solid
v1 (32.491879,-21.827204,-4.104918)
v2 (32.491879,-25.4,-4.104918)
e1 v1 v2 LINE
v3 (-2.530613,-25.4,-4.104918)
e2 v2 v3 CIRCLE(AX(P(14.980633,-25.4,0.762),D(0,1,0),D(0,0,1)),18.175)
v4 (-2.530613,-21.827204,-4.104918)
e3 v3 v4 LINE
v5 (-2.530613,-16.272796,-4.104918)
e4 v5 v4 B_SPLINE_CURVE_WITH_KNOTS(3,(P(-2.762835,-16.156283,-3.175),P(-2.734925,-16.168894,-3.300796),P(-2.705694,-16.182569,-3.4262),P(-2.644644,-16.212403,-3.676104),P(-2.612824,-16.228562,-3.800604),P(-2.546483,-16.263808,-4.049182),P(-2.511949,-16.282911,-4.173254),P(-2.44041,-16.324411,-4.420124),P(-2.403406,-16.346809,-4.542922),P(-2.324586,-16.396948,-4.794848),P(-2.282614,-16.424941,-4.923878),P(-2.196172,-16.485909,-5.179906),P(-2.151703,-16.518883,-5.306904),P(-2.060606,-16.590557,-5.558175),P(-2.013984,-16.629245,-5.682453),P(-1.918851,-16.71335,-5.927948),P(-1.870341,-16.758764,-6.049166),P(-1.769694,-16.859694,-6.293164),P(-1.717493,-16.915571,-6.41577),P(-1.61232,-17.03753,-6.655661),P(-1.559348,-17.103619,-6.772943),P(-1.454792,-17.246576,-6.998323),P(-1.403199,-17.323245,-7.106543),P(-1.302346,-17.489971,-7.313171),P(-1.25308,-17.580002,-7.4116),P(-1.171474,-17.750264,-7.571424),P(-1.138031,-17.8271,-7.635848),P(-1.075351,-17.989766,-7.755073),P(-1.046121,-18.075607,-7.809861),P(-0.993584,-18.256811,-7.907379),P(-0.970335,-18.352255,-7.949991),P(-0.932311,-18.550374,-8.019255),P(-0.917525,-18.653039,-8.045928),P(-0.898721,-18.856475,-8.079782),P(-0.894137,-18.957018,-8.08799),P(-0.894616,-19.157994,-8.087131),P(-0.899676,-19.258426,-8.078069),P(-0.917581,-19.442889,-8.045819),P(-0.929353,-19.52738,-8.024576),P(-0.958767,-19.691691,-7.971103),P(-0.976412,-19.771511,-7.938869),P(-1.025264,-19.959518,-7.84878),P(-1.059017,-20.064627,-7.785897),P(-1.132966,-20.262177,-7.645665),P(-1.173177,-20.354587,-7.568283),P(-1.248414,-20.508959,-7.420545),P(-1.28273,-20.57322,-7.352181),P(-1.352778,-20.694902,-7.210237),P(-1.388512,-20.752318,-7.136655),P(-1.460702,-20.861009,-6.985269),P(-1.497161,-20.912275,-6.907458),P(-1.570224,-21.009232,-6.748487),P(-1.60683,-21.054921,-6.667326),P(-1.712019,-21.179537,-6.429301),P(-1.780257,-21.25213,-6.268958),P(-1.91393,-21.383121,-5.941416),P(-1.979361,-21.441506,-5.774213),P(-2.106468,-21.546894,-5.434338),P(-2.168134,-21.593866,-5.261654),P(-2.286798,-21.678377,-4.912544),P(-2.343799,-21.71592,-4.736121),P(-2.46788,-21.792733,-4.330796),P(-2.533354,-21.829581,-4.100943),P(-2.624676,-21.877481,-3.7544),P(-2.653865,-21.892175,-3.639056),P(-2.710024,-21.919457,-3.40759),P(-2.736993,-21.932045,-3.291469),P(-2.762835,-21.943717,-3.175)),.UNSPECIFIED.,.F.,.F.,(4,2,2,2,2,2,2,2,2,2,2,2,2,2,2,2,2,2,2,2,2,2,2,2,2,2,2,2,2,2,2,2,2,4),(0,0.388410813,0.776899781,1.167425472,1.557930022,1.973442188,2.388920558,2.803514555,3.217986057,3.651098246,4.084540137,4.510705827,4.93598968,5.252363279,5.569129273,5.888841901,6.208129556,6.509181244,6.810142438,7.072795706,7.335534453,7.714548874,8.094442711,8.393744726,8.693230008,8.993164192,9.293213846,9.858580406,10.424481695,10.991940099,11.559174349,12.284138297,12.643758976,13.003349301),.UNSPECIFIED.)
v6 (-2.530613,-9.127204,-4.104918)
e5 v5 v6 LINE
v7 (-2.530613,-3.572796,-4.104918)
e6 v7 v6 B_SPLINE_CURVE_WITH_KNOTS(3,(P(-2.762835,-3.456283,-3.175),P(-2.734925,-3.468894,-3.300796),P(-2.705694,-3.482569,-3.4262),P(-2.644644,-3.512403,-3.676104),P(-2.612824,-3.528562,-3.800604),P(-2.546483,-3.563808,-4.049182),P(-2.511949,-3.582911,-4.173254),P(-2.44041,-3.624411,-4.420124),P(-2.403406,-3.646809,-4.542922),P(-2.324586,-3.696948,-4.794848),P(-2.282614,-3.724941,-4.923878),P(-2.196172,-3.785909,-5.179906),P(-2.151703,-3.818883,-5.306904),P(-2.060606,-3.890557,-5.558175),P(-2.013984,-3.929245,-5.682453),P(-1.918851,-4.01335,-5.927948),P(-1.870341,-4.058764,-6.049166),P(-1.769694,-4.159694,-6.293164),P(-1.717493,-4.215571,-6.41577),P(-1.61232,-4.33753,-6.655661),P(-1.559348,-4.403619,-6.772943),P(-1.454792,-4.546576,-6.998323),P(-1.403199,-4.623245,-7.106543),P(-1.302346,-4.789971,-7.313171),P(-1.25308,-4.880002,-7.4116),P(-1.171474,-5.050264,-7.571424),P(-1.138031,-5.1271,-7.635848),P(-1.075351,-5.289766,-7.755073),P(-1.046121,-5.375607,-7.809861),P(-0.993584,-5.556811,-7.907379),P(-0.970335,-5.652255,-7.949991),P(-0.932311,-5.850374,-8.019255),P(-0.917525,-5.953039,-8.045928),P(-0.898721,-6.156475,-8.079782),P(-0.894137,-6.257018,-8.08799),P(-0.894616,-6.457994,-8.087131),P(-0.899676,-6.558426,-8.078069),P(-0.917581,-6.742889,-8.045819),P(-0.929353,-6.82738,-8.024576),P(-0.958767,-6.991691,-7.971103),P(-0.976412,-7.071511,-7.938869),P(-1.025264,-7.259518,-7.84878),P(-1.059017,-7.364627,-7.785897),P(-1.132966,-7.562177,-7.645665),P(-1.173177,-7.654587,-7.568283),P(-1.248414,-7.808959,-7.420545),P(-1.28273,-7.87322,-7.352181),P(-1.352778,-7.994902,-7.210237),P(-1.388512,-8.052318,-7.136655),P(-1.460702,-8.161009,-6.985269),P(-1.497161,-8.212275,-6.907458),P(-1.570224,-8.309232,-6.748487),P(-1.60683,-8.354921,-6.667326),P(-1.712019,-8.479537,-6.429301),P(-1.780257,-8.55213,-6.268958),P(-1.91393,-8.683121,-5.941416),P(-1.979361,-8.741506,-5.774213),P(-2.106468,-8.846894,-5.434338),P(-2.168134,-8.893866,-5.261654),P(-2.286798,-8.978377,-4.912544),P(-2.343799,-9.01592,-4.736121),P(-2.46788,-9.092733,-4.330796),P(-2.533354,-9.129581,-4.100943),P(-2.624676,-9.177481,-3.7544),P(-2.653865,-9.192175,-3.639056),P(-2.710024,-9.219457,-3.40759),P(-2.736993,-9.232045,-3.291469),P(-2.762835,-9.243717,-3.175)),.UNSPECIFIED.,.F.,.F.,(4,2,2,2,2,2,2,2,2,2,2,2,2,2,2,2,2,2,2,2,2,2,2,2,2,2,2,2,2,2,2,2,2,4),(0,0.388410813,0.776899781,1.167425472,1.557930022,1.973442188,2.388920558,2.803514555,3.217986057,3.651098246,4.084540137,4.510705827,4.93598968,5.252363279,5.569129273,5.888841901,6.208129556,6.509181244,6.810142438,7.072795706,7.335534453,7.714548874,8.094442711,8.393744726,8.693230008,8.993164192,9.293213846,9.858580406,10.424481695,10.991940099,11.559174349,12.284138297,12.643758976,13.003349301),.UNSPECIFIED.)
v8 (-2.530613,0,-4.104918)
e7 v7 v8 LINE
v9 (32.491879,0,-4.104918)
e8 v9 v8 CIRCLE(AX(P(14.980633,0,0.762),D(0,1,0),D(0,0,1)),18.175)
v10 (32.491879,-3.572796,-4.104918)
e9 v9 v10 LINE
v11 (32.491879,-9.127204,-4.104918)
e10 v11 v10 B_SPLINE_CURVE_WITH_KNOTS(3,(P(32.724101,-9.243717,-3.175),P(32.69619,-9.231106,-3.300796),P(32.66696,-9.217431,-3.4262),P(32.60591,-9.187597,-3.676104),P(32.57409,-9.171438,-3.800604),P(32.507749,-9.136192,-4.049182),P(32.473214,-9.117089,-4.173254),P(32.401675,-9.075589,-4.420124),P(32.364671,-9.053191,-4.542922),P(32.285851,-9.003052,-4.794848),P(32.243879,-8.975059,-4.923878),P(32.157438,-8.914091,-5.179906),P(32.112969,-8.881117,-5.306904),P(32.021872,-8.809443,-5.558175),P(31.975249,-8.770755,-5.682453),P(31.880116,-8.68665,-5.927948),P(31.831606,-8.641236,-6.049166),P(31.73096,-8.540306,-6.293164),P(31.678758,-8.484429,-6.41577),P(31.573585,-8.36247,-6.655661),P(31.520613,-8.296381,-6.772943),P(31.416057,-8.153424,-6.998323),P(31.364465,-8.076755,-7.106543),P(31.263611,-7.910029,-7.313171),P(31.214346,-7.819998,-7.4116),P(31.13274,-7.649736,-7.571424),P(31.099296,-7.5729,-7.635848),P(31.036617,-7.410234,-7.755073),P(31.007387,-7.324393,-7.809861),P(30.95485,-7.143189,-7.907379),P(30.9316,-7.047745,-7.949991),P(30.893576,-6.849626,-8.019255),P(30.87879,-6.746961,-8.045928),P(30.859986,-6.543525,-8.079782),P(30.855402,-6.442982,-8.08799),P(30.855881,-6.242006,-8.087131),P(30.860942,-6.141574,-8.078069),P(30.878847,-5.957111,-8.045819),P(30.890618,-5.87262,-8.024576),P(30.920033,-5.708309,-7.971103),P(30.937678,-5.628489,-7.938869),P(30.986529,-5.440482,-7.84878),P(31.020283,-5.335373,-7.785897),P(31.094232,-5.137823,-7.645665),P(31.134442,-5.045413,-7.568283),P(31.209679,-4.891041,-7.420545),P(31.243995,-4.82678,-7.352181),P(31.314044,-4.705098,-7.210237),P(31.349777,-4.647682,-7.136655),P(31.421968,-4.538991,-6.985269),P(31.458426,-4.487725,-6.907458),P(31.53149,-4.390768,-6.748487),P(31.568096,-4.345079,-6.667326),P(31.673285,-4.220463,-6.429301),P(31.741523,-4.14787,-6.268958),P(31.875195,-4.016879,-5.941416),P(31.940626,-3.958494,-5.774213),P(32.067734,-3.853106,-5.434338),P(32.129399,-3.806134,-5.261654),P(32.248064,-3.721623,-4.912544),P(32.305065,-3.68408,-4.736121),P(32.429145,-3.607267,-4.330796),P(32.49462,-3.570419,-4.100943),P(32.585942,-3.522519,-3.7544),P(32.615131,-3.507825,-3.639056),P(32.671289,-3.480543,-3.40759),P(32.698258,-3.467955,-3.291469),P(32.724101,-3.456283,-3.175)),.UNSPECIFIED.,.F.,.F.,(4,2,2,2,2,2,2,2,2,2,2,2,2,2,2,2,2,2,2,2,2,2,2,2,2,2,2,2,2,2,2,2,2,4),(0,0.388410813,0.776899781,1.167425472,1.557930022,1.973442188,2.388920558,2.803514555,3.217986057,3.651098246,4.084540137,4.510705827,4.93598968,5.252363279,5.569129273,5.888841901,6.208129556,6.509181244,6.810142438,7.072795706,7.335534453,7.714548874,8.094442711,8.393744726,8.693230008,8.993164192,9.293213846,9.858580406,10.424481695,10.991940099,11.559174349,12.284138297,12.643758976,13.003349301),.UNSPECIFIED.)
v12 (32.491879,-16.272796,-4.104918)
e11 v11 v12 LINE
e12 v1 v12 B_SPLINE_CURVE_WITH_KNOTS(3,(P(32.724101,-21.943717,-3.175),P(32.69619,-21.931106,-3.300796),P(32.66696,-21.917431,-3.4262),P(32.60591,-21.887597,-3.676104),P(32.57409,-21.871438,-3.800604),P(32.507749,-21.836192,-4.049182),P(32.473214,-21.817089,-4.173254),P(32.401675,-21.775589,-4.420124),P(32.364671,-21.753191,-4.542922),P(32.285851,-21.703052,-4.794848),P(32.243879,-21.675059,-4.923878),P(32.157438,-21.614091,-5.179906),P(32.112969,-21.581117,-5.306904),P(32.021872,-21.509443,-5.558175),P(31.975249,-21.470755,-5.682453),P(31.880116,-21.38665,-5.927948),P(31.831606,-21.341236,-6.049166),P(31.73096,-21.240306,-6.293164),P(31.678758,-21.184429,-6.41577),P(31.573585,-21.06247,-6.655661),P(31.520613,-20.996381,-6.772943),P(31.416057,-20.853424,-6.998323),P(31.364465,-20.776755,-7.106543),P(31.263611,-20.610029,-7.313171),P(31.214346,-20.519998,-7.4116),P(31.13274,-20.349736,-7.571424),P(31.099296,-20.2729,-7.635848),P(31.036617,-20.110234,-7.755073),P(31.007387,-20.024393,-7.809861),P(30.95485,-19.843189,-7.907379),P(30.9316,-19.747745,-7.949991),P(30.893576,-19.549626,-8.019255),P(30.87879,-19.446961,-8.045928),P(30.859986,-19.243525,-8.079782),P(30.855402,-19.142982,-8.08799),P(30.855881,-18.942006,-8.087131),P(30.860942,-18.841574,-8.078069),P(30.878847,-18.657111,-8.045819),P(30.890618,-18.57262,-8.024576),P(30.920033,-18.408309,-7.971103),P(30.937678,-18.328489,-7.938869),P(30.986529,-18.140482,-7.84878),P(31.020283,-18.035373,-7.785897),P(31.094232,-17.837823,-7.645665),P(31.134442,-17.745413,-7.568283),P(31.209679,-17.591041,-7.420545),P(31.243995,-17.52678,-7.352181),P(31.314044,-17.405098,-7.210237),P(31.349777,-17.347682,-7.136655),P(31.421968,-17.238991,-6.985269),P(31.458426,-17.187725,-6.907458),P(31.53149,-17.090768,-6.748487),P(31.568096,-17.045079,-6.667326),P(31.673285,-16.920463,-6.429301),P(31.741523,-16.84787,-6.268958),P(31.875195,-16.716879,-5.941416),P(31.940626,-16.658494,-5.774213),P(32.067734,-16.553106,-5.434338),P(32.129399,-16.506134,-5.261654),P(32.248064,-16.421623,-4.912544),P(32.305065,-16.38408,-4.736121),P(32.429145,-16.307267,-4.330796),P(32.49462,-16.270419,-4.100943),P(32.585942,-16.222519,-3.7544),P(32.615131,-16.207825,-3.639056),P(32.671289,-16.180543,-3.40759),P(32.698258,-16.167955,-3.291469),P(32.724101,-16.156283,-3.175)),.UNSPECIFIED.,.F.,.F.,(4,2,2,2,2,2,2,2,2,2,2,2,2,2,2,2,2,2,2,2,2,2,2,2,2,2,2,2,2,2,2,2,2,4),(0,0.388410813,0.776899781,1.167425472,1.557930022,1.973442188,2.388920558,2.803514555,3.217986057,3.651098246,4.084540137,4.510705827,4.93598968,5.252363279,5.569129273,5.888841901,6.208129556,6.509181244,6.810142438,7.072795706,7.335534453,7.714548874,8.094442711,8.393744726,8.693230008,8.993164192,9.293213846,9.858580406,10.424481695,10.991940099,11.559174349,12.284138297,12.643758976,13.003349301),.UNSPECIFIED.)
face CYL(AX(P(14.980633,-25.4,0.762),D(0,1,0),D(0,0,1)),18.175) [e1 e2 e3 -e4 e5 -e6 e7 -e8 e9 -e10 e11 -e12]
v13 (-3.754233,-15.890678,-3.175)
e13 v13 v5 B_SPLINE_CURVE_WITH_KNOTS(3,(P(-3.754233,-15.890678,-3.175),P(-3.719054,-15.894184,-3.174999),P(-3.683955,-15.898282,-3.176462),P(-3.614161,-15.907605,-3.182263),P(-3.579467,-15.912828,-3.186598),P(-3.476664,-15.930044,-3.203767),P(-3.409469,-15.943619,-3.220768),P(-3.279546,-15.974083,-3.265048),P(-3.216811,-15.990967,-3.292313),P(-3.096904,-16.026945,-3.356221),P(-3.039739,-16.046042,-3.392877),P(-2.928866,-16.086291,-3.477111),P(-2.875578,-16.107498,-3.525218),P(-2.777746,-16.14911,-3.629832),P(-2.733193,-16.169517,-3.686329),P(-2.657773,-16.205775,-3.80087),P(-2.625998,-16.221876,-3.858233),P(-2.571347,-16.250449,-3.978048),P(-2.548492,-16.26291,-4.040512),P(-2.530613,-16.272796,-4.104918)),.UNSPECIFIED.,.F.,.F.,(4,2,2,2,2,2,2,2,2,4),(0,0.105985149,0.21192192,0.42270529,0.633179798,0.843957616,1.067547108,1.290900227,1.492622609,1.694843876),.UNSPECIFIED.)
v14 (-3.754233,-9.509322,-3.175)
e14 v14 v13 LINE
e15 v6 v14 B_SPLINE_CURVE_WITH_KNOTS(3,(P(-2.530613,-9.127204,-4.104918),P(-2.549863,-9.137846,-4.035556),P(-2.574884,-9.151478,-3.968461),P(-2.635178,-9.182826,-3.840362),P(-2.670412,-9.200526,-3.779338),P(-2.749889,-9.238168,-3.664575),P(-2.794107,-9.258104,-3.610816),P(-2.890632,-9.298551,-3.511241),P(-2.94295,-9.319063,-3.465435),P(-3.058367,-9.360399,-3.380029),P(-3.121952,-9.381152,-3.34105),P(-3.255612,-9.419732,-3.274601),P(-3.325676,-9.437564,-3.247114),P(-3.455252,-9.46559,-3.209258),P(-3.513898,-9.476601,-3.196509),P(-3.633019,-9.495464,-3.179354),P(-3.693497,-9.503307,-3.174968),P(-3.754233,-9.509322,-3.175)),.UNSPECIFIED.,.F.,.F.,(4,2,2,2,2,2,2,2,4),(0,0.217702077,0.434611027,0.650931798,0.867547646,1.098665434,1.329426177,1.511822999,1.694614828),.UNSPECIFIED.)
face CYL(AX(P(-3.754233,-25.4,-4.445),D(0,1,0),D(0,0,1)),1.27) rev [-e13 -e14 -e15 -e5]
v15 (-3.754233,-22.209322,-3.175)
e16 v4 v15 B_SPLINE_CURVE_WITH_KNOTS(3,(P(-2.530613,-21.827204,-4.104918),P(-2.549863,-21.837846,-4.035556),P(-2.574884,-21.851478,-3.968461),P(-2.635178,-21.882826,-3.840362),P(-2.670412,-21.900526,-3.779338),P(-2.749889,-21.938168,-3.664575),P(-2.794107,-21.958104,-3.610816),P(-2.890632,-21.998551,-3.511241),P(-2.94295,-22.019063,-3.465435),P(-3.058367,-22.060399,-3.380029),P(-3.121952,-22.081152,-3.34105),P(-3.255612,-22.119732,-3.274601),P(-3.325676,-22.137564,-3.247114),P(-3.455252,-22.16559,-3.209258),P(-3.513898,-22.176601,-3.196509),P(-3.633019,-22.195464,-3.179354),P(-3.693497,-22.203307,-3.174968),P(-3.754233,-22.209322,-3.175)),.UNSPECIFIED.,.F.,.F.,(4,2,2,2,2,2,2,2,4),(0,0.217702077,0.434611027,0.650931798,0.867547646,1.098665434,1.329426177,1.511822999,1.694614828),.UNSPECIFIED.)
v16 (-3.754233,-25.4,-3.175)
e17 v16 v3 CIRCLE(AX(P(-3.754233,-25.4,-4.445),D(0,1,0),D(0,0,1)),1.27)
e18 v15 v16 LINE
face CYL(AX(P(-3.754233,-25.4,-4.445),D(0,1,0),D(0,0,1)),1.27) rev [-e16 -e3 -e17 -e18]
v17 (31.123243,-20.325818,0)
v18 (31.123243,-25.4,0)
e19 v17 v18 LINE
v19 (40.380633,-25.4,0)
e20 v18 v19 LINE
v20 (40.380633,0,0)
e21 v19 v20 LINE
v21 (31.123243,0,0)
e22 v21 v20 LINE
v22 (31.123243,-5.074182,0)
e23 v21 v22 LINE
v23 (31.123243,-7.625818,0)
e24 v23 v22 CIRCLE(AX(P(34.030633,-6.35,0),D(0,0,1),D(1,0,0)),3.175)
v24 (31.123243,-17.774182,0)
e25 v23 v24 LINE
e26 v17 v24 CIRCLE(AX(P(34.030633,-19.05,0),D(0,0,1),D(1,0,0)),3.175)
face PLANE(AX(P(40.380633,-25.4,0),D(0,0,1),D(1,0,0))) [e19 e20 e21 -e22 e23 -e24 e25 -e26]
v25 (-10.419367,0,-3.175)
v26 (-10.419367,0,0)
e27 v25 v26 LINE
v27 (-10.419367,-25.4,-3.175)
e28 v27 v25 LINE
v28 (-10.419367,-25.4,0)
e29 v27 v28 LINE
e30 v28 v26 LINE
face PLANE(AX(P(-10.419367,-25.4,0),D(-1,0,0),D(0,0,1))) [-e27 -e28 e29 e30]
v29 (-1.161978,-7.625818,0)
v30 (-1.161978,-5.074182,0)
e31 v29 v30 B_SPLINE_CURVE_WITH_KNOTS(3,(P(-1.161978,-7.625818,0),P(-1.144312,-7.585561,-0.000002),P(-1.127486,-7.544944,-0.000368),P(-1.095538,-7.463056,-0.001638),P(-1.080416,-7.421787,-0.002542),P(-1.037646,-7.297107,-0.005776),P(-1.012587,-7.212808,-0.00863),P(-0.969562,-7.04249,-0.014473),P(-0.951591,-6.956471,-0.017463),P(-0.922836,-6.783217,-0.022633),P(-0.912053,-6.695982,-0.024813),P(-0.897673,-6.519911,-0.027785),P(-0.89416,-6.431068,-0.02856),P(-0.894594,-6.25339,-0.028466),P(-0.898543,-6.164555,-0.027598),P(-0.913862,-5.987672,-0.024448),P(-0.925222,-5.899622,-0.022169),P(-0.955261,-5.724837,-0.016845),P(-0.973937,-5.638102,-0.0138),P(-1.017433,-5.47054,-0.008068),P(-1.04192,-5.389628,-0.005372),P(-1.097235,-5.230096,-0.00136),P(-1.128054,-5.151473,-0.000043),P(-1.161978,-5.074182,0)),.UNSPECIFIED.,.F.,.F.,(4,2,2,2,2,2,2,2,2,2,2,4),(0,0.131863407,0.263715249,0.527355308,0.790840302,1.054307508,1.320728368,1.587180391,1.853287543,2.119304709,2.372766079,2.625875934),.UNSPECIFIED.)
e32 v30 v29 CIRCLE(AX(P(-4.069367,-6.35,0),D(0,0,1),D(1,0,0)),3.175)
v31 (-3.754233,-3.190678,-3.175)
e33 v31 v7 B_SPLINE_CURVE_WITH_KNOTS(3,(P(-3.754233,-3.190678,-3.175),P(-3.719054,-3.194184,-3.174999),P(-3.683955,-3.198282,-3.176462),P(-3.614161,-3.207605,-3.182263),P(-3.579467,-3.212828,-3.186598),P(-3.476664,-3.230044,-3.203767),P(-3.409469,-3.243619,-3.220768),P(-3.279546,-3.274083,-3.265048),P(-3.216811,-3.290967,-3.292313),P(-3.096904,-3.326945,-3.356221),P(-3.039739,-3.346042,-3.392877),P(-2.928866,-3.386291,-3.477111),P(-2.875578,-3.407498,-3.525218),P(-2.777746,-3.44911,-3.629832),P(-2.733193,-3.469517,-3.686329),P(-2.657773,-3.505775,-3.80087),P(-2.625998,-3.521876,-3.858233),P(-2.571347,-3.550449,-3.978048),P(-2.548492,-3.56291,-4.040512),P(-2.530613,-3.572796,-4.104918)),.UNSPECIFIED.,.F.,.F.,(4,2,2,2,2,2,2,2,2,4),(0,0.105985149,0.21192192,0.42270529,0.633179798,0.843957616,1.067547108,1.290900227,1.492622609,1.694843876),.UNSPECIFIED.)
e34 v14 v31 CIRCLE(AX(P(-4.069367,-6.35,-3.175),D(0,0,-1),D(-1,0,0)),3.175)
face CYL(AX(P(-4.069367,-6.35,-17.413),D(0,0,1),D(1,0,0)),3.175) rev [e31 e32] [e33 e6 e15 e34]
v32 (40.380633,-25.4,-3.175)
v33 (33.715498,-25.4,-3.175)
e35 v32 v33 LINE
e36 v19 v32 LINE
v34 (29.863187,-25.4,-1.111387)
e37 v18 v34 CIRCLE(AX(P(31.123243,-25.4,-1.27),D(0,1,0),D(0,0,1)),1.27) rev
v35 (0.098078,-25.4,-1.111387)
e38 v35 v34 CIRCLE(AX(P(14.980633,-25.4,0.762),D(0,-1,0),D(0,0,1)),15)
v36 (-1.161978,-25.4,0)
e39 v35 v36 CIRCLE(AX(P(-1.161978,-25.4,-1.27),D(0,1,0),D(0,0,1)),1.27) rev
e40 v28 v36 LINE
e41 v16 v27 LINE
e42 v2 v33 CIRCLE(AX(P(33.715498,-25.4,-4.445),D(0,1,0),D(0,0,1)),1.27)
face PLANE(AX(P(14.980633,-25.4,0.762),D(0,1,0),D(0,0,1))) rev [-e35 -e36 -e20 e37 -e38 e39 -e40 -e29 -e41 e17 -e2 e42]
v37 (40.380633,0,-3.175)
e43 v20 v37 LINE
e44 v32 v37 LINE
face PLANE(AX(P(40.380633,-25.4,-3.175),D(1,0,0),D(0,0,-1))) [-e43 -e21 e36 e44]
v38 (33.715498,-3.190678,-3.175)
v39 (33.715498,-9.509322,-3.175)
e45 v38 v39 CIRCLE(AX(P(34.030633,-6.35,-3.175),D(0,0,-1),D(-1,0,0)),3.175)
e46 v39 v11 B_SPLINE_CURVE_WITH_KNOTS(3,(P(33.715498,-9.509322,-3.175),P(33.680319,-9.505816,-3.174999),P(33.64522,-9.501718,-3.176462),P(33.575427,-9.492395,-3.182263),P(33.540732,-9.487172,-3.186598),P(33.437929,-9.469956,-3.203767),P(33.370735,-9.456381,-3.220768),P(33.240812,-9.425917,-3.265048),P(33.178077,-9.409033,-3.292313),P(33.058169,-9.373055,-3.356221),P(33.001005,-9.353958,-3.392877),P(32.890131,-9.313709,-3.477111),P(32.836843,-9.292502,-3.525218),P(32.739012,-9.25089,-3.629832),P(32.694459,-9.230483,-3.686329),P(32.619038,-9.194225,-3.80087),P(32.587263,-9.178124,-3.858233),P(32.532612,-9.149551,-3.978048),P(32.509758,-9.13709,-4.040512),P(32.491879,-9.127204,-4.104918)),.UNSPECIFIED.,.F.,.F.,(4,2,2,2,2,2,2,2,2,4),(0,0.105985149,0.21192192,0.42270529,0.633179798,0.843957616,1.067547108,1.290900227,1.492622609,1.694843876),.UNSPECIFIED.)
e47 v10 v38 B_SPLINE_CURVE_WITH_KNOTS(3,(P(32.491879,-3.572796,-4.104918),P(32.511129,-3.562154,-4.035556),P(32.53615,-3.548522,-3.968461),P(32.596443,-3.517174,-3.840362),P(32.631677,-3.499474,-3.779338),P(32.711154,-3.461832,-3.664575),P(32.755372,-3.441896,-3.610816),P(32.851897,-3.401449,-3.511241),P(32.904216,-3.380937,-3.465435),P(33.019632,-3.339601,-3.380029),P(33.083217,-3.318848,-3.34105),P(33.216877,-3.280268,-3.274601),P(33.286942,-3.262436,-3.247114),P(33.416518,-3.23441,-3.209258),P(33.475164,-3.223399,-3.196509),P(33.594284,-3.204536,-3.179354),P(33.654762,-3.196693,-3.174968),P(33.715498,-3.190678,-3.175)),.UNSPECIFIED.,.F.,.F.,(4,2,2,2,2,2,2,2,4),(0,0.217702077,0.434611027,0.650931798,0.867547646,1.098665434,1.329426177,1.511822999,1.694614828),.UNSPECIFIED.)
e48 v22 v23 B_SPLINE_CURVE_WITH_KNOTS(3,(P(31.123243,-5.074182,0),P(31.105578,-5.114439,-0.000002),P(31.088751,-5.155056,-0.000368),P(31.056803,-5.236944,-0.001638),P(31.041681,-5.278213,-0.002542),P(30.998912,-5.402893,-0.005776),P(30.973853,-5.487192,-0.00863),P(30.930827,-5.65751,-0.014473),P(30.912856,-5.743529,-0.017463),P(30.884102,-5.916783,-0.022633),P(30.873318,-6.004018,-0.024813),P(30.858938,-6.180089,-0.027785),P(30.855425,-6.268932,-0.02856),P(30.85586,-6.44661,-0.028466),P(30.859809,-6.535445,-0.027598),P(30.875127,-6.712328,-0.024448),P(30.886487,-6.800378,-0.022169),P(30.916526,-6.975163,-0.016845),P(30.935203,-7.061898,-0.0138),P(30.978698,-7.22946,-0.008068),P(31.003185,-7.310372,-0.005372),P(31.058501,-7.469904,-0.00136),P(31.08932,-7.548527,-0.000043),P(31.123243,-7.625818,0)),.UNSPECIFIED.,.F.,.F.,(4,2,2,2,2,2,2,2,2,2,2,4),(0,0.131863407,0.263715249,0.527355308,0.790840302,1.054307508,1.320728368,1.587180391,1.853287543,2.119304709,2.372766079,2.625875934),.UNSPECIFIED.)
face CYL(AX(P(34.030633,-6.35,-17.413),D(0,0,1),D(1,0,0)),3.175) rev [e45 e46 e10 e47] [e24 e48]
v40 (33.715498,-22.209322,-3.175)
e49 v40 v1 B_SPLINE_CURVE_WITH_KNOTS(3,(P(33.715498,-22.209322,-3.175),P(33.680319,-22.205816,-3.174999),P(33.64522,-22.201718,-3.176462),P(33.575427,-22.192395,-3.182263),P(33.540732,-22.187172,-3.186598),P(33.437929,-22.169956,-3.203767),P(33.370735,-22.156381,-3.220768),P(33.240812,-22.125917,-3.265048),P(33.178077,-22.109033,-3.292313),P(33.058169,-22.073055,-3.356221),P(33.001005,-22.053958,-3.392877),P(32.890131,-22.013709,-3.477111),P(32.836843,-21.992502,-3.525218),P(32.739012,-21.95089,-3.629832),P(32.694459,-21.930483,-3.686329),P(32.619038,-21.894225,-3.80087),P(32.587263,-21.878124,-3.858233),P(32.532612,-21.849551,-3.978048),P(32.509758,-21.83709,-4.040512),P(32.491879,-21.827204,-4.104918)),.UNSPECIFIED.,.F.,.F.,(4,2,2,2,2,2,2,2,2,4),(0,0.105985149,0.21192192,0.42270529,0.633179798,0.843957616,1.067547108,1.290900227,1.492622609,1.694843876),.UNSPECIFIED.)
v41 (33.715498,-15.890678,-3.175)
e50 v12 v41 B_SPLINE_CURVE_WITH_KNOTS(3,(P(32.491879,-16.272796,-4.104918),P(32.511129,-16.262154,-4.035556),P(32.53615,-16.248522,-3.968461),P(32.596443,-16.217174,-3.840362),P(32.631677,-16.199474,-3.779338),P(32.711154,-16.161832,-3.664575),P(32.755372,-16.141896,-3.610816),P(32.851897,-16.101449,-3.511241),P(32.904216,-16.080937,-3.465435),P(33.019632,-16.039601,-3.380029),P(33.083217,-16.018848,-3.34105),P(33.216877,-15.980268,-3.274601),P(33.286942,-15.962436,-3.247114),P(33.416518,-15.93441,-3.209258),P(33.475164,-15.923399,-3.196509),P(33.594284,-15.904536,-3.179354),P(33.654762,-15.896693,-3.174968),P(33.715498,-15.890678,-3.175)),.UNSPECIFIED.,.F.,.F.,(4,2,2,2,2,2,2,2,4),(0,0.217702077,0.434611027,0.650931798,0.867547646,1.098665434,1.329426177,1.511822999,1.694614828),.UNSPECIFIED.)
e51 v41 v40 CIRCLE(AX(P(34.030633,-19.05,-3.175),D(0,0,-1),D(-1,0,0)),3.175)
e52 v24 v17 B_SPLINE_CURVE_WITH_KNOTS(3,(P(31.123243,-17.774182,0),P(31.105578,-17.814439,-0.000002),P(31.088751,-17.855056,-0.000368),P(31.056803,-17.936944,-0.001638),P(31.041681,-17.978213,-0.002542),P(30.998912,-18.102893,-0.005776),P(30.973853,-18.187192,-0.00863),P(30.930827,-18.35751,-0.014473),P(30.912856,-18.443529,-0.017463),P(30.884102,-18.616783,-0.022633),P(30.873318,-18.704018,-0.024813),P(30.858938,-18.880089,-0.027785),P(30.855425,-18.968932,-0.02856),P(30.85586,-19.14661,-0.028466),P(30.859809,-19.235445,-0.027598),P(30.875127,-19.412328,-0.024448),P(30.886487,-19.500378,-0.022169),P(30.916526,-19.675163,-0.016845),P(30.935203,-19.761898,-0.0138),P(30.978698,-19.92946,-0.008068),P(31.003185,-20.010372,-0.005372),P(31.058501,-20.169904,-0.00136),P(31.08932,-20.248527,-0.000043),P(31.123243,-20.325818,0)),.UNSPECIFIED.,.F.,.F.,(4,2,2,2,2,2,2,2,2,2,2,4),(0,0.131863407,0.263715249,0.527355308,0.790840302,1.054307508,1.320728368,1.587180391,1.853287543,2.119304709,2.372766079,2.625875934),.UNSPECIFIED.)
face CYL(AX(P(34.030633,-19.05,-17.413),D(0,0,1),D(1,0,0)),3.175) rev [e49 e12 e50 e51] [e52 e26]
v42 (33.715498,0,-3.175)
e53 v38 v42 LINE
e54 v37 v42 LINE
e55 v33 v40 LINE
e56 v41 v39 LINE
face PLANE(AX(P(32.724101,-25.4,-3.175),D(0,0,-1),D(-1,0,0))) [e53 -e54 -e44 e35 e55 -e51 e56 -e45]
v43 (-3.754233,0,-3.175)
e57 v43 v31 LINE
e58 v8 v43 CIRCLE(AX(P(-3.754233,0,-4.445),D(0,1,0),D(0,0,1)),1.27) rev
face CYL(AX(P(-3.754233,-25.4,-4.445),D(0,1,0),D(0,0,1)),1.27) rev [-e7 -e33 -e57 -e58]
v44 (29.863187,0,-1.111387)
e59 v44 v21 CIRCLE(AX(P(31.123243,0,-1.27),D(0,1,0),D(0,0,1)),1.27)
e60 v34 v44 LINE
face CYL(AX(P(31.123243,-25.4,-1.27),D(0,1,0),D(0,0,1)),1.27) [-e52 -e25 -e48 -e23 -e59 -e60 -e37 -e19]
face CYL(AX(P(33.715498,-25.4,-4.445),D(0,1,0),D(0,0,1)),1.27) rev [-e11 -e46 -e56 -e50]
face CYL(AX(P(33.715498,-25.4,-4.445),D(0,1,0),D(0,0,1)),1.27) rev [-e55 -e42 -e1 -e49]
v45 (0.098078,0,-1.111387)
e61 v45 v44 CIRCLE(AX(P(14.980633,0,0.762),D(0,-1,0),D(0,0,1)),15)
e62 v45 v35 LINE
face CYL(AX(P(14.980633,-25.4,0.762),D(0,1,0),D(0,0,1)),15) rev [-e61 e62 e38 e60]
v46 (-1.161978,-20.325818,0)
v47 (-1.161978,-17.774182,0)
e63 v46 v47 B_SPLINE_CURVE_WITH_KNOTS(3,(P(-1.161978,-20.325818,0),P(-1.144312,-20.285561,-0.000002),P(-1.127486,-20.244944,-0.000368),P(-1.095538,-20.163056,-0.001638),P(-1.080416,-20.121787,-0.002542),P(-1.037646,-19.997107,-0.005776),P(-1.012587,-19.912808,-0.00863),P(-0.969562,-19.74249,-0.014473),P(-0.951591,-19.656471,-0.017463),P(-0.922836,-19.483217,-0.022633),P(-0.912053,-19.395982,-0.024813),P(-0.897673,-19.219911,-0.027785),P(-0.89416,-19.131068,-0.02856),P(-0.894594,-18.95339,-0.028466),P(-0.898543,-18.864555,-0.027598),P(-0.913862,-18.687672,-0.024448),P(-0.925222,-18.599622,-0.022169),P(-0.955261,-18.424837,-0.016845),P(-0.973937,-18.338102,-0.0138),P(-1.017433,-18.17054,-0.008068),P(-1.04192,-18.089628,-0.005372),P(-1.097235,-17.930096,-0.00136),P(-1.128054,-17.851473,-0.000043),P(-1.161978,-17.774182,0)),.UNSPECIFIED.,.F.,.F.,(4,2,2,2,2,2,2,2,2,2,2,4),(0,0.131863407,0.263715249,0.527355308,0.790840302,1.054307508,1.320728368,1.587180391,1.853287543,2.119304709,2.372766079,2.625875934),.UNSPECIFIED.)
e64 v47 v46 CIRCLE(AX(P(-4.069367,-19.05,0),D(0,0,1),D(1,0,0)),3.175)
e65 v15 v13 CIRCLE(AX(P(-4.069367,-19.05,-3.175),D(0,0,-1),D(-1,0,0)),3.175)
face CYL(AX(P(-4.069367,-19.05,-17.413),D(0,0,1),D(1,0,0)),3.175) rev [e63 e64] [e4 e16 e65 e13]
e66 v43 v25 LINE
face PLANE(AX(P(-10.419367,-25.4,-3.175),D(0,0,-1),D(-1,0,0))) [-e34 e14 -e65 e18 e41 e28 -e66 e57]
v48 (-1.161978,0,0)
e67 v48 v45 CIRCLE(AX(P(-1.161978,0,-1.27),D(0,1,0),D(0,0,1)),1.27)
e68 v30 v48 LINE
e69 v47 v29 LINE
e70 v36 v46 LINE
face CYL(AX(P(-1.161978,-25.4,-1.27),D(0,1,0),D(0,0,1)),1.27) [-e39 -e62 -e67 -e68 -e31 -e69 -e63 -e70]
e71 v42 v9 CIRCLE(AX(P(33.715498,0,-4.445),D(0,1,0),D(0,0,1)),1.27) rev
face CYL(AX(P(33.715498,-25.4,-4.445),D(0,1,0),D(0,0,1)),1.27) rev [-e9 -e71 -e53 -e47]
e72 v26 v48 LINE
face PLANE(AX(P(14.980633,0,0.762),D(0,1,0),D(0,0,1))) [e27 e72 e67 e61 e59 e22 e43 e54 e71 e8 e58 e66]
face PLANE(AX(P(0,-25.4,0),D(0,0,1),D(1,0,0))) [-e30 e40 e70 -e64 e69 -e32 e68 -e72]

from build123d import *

# Parameters (mm, degrees)
BOSS_EXTRUDE1_DEPTH = 25.4
SKETCH3_R           = 3.175
CUT_EXTRUDE1_DEPTH  = 51.78354129
FILLET1_R           = 1.27


with BuildPart() as part:
    # Sketch2 → Boss-Extrude1 (new body)
    with BuildSketch(Plane(origin=(0, 0, 0), x_dir=(1, 0, 0), z_dir=(0, 1, 0))):
        with BuildLine():
            Line((0, 0), (-10.419367303, 0))
            Line((-10.419367303, 0), (-10.419367303, 3.175))
            Line((-10.419367303, 3.175), (-2.762835284, 3.175))
            ThreePointArc((-2.762835284, 3.175), (14.980632697, 17.413), (32.724100678, 3.175))
            Line((32.724100678, 3.175), (40.380632697, 3.175))
            Line((40.380632697, 3.175), (40.380632697, 0))
            Line((40.380632697, 0), (29.961265394, 0))
            ThreePointArc((29.961265394, 0), (14.980632697, 14.238), (0, 0))
        make_face()
    extrude(amount=-BOSS_EXTRUDE1_DEPTH)

    # Sketch3 → Cut-Extrude1 (cut, through all)
    with BuildSketch(Plane.XY):
        with Locations((-4.069367303, -6.35)):
            Circle(SKETCH3_R)
        with Locations((34.030632697, -6.35)):
            Circle(SKETCH3_R)
        with Locations((-4.069367303, -19.05)):
            Circle(SKETCH3_R)
        with Locations((34.030632697, -19.05)):
            Circle(SKETCH3_R)
    extrude(amount=-CUT_EXTRUDE1_DEPTH, mode=Mode.SUBTRACT)

    # Fillet1
    # the kernel refuses this fillet: 1.27 mm, written as the material it adds along each edge
    with BuildSketch(Plane(origin=(32.724100678, 0, -3.175), x_dir=(1, 0, 0), z_dir=(0, -1, 0))) as fillet1_piece_1_section:
        with BuildLine():
            CenterArc((0.991397271, -1.27), FILLET1_R, 90, 74.467738735)
            ThreePointArc((-0.232222111, -0.929918231), (-0.109979978, -0.466490187), (0, 0))
            Line((0, 0), (0.991397271, 0))
        make_face()
    fillet1_piece_1 = extrude(amount=5.934776002, mode=Mode.PRIVATE)
    fillet1_piece_1 = fillet1_piece_1 - Plane(origin=(34.030632697, -6.35, -3.384746049), x_dir=(1, 0, 0), z_dir=(0, 0, 1)) * Cylinder(3.175, 16, mode=Mode.PRIVATE)
    add(fillet1_piece_1)
    with BuildSketch(Plane(origin=(32.724100678, -19.465223998, -3.175), x_dir=(1, 0, 0), z_dir=(0, -1, 0))) as fillet1_piece_2_section:
        with BuildLine():
            CenterArc((0.991397271, -1.27), FILLET1_R, 90, 74.467738735)
            ThreePointArc((-0.232222111, -0.929918231), (-0.109979978, -0.466490187), (0, 0))
            Line((0, 0), (0.991397271, 0))
        make_face()
    fillet1_piece_2 = extrude(amount=5.934776002, mode=Mode.PRIVATE)
    fillet1_piece_2 = fillet1_piece_2 - Plane(origin=(34.030632697, -19.05, -3.384746046), x_dir=(1, 0, 0), z_dir=(0, 0, 1)) * Cylinder(3.175, 16, mode=Mode.PRIVATE)
    add(fillet1_piece_2)
    with BuildSketch(Plane(origin=(32.724100678, -6.765223998, -3.175), x_dir=(1, 0, 0), z_dir=(0, -1, 0))) as fillet1_piece_3_section:
        with BuildLine():
            CenterArc((0.991397271, -1.27), FILLET1_R, 90, 74.467738735)
            ThreePointArc((-0.232222111, -0.929918231), (-0.109979978, -0.466490187), (0, 0))
            Line((0, 0), (0.991397271, 0))
        make_face()
    fillet1_piece_3 = extrude(amount=11.869552004, mode=Mode.PRIVATE)
    fillet1_piece_3 = fillet1_piece_3 - Plane(origin=(34.030632697, -19.05, -3.384746051), x_dir=(1, 0, 0), z_dir=(0, 0, 1)) * Cylinder(3.175, 28, mode=Mode.PRIVATE)
    fillet1_piece_3 = fillet1_piece_3 - Plane(origin=(34.030632697, -6.35, -3.384746051), x_dir=(1, 0, 0), z_dir=(0, 0, 1)) * Cylinder(3.175, 28, mode=Mode.PRIVATE)
    add(fillet1_piece_3)
    with BuildSketch(Plane(origin=(-2.762835284, 0, -3.175), x_dir=(0.24228281636804117, 0, -0.9702056673163532), z_dir=(0, -1, 0))) as fillet1_piece_4_section:
        with BuildLine():
            CenterArc((0.991962675, -1.269558427), FILLET1_R, 91.510947972, 74.467738735)
            Line((-0.240198523, -0.96185925), (0, 0))
            ThreePointArc((0, 0), (0.479237682, -0.006319359), (0.958475365, 0))
        make_face()
    fillet1_piece_4 = extrude(amount=5.934776002, mode=Mode.PRIVATE)
    fillet1_piece_4 = fillet1_piece_4 - Plane(origin=(-4.069367303, -6.35, -3.384746045), x_dir=(1, 0, 0), z_dir=(0, 0, 1)) * Cylinder(3.175, 16, mode=Mode.PRIVATE)
    add(fillet1_piece_4)
    with BuildSketch(Plane(origin=(-2.762835284, -19.465223998, -3.175), x_dir=(0.24228281636804025, 0, -0.9702056673163533), z_dir=(0, -1, 0))) as fillet1_piece_5_section:
        with BuildLine():
            CenterArc((0.991962675, -1.269558427), FILLET1_R, 91.510947972, 74.467738735)
            Line((-0.240198523, -0.96185925), (0, 0))
            ThreePointArc((0, 0), (0.479237682, -0.006319359), (0.958475365, 0))
        make_face()
    fillet1_piece_5 = extrude(amount=5.934776002, mode=Mode.PRIVATE)
    fillet1_piece_5 = fillet1_piece_5 - Plane(origin=(-4.069367303, -19.05, -3.384746049), x_dir=(1, 0, 0), z_dir=(0, 0, 1)) * Cylinder(3.175, 16, mode=Mode.PRIVATE)
    add(fillet1_piece_5)
    with BuildSketch(Plane(origin=(-2.762835284, -6.765223998, -3.175), x_dir=(0.24228281636804025, 0, -0.9702056673163533), z_dir=(0, -1, 0))) as fillet1_piece_6_section:
        with BuildLine():
            CenterArc((0.991962675, -1.269558427), FILLET1_R, 91.510947972, 74.467738735)
            Line((-0.240198523, -0.96185925), (0, 0))
            ThreePointArc((0, 0), (0.479237682, -0.006319359), (0.958475365, 0))
        make_face()
    fillet1_piece_6 = extrude(amount=11.869552004, mode=Mode.PRIVATE)
    fillet1_piece_6 = fillet1_piece_6 - Plane(origin=(-4.069367303, -19.05, -3.38474605), x_dir=(1, 0, 0), z_dir=(0, 0, 1)) * Cylinder(3.175, 28, mode=Mode.PRIVATE)
    fillet1_piece_6 = fillet1_piece_6 - Plane(origin=(-4.069367303, -6.35, -3.38474605), x_dir=(1, 0, 0), z_dir=(0, 0, 1)) * Cylinder(3.175, 28, mode=Mode.PRIVATE)
    add(fillet1_piece_6)
    # the kernel refuses this fillet: 1.27 mm, written as the material it takes off along each edge
    with BuildSketch(Plane(origin=(29.961265394, 2.904944682, 0), x_dir=(1, 0, 0), z_dir=(0, -1, 0))) as fillet1_2_piece_1:
        with BuildLine():
            CenterArc((1.161977873, -1.27), FILLET1_R, 90, 82.825455624)
            ThreePointArc((-0.098078392, -1.111386601), (-0.038702449, -0.556605505), (0, 0))
            Line((0, 0), (1.161977873, 0))
        make_face()
    extrude(amount=31.209889363, mode=Mode.SUBTRACT)
    with BuildSketch(Plane(origin=(0, 2.904944682, 0), x_dir=(0.08790703364755922, 0, -0.996128683170647), z_dir=(0, -1, 0))) as fillet1_2_piece_2:
        with BuildLine():
            CenterArc((1.1629374, -1.269121421), FILLET1_R, 92.131332721, 82.825455624)
            Line((-0.102146028, -1.157479488), (0, 0))
            ThreePointArc((0, 0), (0.557852926, -0.010376919), (1.115705852, 0))
        make_face()
    extrude(amount=31.209889363, mode=Mode.SUBTRACT)


solid = part.part
